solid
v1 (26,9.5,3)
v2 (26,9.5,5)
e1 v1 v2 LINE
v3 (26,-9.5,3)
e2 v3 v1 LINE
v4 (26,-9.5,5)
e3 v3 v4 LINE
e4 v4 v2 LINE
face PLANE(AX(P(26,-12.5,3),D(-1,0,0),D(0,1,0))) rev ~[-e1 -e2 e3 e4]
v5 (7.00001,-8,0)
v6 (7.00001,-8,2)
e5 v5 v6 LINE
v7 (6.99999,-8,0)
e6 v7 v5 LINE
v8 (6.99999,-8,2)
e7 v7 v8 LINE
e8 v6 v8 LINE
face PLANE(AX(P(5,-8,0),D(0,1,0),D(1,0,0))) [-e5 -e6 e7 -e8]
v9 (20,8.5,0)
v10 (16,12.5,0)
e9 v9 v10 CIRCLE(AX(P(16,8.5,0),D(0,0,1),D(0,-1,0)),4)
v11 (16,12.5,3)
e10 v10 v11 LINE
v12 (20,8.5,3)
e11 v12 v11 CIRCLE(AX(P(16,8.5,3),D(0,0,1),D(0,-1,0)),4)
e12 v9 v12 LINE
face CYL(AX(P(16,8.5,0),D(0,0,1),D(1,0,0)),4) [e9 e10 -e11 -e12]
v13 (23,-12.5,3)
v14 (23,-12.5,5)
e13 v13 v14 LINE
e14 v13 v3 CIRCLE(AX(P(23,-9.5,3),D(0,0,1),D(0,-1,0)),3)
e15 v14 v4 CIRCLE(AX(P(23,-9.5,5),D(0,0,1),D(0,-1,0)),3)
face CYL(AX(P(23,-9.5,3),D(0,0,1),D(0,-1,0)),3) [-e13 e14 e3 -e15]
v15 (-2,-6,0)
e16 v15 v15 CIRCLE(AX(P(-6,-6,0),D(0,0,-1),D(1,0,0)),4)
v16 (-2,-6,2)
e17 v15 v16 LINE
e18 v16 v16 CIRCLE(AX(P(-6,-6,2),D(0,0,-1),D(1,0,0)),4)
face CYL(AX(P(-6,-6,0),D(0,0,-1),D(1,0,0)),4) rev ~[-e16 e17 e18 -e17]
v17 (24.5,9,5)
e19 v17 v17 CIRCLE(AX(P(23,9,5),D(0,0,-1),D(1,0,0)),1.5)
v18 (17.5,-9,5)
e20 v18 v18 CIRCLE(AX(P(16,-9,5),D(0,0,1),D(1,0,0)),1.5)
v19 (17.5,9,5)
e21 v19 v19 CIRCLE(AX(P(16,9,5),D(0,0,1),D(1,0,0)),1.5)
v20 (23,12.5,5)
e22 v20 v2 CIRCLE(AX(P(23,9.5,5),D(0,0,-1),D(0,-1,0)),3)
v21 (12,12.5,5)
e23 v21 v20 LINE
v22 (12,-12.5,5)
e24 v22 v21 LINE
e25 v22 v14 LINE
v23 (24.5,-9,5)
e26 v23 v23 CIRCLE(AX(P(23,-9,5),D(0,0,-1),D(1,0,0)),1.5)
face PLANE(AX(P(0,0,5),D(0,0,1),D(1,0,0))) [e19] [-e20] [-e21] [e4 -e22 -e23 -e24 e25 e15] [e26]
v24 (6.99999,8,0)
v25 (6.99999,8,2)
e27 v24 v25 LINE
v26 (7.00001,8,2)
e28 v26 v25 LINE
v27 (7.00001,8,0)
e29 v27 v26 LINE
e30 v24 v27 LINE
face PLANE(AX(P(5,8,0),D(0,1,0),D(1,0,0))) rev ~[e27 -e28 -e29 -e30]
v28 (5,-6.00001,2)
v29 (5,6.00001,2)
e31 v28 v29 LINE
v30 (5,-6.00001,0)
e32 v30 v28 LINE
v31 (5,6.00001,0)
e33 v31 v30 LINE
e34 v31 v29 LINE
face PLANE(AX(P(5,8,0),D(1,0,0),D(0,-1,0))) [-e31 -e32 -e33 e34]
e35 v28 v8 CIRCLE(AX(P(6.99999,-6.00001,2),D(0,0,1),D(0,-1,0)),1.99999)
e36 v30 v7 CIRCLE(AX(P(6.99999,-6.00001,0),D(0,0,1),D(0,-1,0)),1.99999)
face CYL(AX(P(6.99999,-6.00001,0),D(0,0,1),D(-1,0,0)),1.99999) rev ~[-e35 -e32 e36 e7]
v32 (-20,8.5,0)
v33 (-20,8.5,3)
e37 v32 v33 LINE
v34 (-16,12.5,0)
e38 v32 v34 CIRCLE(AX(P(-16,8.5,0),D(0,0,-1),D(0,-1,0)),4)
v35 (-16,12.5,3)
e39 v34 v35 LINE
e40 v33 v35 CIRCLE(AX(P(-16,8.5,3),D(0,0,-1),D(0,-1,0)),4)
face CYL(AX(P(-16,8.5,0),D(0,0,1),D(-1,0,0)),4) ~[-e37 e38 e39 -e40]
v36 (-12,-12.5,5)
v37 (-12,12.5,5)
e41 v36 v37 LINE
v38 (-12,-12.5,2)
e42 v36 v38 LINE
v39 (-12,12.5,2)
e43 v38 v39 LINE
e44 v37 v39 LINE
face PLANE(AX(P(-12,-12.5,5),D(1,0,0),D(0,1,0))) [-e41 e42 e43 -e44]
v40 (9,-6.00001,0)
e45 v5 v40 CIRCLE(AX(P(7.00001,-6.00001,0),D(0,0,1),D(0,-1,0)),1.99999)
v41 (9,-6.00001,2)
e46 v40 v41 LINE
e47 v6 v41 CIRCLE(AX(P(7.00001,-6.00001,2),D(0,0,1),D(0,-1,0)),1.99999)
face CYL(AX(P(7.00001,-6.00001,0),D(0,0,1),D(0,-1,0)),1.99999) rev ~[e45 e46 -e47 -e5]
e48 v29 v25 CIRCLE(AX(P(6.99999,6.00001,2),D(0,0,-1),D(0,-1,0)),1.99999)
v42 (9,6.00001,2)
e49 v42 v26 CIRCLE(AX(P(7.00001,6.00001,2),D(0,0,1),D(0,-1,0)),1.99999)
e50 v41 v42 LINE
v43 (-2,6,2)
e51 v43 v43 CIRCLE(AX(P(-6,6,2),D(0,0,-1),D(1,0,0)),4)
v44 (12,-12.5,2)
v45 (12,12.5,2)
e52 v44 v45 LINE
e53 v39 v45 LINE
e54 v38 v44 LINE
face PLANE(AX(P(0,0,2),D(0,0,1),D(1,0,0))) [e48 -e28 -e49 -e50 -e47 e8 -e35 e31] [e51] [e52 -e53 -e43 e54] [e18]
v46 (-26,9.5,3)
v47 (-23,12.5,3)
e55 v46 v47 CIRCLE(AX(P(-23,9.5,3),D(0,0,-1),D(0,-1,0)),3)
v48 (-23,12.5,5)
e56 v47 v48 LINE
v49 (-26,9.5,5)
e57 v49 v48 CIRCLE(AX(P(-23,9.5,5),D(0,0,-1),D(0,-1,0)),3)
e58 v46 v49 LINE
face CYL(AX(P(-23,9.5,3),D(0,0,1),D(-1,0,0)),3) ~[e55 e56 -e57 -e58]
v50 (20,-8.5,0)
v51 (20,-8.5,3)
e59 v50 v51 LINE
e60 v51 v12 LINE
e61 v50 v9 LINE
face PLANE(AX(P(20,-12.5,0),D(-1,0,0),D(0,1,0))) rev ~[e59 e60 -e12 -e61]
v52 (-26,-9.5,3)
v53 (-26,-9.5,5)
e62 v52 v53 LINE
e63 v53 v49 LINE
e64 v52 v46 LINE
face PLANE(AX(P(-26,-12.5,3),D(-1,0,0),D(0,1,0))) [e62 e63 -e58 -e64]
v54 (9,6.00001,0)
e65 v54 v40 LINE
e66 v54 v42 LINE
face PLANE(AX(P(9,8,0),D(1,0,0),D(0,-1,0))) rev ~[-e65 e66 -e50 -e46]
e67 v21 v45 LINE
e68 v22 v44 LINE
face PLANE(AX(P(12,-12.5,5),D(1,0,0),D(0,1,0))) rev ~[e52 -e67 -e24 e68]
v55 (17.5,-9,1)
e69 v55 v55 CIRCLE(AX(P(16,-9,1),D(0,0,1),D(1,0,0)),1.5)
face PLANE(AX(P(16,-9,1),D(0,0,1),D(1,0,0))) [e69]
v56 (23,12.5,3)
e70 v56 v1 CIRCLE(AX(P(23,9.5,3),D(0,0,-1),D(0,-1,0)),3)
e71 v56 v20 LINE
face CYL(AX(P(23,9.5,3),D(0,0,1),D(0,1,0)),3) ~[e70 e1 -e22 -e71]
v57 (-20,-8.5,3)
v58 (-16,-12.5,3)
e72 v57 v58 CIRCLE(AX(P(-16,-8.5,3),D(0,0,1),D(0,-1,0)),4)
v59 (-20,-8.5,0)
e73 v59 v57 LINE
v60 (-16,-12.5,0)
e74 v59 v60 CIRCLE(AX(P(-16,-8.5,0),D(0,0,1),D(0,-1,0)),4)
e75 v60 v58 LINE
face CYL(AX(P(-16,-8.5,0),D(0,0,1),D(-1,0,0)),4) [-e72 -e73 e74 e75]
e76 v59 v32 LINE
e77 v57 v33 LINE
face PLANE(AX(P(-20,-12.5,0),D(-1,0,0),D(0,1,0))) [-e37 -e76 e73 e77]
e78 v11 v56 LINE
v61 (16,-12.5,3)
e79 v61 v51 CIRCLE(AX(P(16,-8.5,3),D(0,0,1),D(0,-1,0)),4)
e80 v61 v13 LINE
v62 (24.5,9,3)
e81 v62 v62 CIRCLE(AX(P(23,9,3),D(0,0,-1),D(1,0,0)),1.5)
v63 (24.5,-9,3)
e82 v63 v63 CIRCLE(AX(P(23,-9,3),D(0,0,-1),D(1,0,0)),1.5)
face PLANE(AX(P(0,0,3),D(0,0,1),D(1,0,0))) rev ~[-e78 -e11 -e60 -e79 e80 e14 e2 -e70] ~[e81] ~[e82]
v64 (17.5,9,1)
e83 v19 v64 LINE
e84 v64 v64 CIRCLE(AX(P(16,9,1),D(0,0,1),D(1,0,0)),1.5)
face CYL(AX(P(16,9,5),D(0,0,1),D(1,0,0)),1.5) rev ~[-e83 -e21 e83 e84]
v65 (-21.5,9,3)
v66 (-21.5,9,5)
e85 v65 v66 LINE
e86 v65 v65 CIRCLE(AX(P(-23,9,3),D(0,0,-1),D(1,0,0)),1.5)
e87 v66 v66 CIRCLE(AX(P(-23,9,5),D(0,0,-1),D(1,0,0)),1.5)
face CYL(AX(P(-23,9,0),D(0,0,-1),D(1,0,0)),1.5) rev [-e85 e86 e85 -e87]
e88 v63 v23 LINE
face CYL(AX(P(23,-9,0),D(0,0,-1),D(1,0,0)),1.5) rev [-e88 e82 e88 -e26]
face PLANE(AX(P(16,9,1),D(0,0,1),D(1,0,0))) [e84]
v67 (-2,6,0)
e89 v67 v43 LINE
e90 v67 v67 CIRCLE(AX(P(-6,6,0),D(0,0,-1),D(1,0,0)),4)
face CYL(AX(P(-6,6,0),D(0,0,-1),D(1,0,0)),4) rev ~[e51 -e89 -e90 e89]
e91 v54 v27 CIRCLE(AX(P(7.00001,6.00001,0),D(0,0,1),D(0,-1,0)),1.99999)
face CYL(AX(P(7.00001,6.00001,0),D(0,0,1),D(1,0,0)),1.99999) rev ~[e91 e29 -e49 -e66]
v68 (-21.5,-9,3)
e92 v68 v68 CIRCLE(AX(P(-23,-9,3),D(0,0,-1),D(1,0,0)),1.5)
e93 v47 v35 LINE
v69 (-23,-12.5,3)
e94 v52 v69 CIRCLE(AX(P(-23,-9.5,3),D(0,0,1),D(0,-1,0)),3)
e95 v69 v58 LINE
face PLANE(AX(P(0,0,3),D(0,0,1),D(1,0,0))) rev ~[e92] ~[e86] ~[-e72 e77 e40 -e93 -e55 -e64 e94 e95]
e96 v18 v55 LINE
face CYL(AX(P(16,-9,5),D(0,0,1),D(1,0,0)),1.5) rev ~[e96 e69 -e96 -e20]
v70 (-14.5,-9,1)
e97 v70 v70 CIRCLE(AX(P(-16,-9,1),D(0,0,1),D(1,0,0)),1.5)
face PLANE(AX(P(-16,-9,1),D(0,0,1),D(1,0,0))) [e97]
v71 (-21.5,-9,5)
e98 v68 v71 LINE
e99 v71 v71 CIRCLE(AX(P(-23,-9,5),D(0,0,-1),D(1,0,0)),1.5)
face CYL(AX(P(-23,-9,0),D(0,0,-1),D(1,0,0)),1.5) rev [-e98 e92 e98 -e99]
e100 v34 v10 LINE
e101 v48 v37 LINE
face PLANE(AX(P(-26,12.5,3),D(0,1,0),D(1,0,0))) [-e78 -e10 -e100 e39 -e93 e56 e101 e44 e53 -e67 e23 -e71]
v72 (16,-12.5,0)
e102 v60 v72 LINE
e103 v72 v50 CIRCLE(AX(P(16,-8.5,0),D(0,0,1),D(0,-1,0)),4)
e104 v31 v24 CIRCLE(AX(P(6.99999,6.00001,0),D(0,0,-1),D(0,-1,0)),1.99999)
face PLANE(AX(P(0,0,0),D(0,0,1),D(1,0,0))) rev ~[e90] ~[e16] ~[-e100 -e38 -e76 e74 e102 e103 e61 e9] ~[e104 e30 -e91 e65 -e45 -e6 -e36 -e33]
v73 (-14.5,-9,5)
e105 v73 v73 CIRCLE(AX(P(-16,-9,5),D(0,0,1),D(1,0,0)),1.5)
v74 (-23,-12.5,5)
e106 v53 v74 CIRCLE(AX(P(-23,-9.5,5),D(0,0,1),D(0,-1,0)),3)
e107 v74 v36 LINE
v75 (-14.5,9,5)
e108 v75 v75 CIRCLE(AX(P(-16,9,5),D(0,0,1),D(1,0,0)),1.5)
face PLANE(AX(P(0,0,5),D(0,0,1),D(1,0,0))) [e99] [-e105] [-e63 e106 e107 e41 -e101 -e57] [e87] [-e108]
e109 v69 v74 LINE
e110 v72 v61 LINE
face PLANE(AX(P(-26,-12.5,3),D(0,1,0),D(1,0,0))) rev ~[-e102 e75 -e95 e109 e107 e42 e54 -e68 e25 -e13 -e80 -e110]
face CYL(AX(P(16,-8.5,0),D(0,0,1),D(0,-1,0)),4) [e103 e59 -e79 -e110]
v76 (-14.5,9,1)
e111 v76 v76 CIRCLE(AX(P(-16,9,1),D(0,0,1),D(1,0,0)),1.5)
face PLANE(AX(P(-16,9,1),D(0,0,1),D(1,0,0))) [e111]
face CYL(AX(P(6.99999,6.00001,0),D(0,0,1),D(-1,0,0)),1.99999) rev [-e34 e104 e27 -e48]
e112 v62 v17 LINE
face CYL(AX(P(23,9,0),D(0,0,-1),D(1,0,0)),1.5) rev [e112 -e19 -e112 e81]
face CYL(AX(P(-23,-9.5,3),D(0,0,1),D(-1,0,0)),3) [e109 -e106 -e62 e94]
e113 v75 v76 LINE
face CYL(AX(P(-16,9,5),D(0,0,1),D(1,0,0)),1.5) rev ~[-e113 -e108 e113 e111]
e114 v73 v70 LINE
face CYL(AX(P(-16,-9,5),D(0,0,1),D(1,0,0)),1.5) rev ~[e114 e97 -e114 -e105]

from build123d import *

# Parameters (mm, degrees)
F0_W      = 40
F0_H      = 25
F1_DEPTH  = 3
F2_R      = 4
F3_W      = 52
F3_H      = 25
F4_DEPTH  = 2
F5_R      = 3
F6_R      = 1.5
F7_DEPTH  = 25
F8_R      = 1.5
F9_DEPTH  = 4
F10_W     = 24
F10_H     = 25
F11_DEPTH = 3
F12_W     = 4
F12_H     = 16
F12_R     = 4
F13_DEPTH = 25
F14_R     = 1.99999


# Not quite as in the source:
# - a fillet or chamfer is up to 0.001 mm smaller than in the source, because OpenCascade refuses the exact size


with BuildPart() as f1:
    # F0 (on Top) → F1 (new body)
    with BuildSketch(Plane.XY):
        Rectangle(F0_W, F0_H)
    extrude(amount=F1_DEPTH)

    # F2
    f2_edges = [f1.edges().sort_by_distance(p)[0] for p in [
        (-20, -12.5, 1.5),
        (-20, 12.5, 1.5),
        (20, -12.5, 1.5),
        (20, 12.5, 1.5),
    ]]
    fillet(f2_edges, radius=F2_R)

    # F3 (on face) → F4 (join)
    with BuildSketch(Plane.XY.offset(3)):
        Rectangle(F3_W, F3_H)
    extrude(amount=F4_DEPTH)

    # F5
    f5_edges = [f1.edges().sort_by_distance(p)[0] for p in [
        (26, 12.5, 4),
        (26, -12.5, 4),
        (-26, -12.5, 4),
        (-26, 12.5, 4),
    ]]
    fillet(f5_edges, radius=F5_R)

    # F6 (on Top) → F7 (cut)
    with BuildSketch(Plane.XY):
        with Locations((23, 9)):
            Circle(F6_R)
        with Locations((23, -9)):
            Circle(F6_R)
        with Locations((-23, -9)):
            Circle(F6_R)
        with Locations((-23, 9)):
            Circle(F6_R)
    extrude(amount=F7_DEPTH, mode=Mode.SUBTRACT)

    # F8 (on face) → F9 (cut)
    with BuildSketch(Plane.XY.offset(5)):
        with Locations((16, -9)):
            Circle(F8_R)
        with Locations((-16, -9)):
            Circle(F8_R)
        with Locations((-16, 9)):
            Circle(F8_R)
        with Locations((16, 9)):
            Circle(F8_R)
    extrude(amount=-F9_DEPTH, mode=Mode.SUBTRACT)

    # F10 (on face) → F11 (cut)
    with BuildSketch(Plane.XY.offset(5)):
        Rectangle(F10_W, F10_H)
    extrude(amount=-F11_DEPTH, mode=Mode.SUBTRACT)

    # F12 (on face) → F13 (cut)
    with BuildSketch(Plane(origin=(0, 0, 0), x_dir=(1, 0, 0), z_dir=(0, 0, -1))):
        with Locations((7, 0)):
            Rectangle(F12_W, F12_H)
        with Locations((-6, -6)):
            Circle(F12_R)
        with Locations((-6, 6)):
            Circle(F12_R)
    extrude(amount=-F13_DEPTH, mode=Mode.SUBTRACT)

    # F14 (radius 2 in the source; OpenCascade refuses exactly that, so slightly less here)
    f14_edges = [f1.edges().sort_by_distance(p)[0] for p in [
        (9, 8, 1),
        (5, 8, 1),
        (9, -8, 1),
        (5, -8, 1),
    ]]
    fillet(f14_edges, radius=F14_R)


solid = f1.part
